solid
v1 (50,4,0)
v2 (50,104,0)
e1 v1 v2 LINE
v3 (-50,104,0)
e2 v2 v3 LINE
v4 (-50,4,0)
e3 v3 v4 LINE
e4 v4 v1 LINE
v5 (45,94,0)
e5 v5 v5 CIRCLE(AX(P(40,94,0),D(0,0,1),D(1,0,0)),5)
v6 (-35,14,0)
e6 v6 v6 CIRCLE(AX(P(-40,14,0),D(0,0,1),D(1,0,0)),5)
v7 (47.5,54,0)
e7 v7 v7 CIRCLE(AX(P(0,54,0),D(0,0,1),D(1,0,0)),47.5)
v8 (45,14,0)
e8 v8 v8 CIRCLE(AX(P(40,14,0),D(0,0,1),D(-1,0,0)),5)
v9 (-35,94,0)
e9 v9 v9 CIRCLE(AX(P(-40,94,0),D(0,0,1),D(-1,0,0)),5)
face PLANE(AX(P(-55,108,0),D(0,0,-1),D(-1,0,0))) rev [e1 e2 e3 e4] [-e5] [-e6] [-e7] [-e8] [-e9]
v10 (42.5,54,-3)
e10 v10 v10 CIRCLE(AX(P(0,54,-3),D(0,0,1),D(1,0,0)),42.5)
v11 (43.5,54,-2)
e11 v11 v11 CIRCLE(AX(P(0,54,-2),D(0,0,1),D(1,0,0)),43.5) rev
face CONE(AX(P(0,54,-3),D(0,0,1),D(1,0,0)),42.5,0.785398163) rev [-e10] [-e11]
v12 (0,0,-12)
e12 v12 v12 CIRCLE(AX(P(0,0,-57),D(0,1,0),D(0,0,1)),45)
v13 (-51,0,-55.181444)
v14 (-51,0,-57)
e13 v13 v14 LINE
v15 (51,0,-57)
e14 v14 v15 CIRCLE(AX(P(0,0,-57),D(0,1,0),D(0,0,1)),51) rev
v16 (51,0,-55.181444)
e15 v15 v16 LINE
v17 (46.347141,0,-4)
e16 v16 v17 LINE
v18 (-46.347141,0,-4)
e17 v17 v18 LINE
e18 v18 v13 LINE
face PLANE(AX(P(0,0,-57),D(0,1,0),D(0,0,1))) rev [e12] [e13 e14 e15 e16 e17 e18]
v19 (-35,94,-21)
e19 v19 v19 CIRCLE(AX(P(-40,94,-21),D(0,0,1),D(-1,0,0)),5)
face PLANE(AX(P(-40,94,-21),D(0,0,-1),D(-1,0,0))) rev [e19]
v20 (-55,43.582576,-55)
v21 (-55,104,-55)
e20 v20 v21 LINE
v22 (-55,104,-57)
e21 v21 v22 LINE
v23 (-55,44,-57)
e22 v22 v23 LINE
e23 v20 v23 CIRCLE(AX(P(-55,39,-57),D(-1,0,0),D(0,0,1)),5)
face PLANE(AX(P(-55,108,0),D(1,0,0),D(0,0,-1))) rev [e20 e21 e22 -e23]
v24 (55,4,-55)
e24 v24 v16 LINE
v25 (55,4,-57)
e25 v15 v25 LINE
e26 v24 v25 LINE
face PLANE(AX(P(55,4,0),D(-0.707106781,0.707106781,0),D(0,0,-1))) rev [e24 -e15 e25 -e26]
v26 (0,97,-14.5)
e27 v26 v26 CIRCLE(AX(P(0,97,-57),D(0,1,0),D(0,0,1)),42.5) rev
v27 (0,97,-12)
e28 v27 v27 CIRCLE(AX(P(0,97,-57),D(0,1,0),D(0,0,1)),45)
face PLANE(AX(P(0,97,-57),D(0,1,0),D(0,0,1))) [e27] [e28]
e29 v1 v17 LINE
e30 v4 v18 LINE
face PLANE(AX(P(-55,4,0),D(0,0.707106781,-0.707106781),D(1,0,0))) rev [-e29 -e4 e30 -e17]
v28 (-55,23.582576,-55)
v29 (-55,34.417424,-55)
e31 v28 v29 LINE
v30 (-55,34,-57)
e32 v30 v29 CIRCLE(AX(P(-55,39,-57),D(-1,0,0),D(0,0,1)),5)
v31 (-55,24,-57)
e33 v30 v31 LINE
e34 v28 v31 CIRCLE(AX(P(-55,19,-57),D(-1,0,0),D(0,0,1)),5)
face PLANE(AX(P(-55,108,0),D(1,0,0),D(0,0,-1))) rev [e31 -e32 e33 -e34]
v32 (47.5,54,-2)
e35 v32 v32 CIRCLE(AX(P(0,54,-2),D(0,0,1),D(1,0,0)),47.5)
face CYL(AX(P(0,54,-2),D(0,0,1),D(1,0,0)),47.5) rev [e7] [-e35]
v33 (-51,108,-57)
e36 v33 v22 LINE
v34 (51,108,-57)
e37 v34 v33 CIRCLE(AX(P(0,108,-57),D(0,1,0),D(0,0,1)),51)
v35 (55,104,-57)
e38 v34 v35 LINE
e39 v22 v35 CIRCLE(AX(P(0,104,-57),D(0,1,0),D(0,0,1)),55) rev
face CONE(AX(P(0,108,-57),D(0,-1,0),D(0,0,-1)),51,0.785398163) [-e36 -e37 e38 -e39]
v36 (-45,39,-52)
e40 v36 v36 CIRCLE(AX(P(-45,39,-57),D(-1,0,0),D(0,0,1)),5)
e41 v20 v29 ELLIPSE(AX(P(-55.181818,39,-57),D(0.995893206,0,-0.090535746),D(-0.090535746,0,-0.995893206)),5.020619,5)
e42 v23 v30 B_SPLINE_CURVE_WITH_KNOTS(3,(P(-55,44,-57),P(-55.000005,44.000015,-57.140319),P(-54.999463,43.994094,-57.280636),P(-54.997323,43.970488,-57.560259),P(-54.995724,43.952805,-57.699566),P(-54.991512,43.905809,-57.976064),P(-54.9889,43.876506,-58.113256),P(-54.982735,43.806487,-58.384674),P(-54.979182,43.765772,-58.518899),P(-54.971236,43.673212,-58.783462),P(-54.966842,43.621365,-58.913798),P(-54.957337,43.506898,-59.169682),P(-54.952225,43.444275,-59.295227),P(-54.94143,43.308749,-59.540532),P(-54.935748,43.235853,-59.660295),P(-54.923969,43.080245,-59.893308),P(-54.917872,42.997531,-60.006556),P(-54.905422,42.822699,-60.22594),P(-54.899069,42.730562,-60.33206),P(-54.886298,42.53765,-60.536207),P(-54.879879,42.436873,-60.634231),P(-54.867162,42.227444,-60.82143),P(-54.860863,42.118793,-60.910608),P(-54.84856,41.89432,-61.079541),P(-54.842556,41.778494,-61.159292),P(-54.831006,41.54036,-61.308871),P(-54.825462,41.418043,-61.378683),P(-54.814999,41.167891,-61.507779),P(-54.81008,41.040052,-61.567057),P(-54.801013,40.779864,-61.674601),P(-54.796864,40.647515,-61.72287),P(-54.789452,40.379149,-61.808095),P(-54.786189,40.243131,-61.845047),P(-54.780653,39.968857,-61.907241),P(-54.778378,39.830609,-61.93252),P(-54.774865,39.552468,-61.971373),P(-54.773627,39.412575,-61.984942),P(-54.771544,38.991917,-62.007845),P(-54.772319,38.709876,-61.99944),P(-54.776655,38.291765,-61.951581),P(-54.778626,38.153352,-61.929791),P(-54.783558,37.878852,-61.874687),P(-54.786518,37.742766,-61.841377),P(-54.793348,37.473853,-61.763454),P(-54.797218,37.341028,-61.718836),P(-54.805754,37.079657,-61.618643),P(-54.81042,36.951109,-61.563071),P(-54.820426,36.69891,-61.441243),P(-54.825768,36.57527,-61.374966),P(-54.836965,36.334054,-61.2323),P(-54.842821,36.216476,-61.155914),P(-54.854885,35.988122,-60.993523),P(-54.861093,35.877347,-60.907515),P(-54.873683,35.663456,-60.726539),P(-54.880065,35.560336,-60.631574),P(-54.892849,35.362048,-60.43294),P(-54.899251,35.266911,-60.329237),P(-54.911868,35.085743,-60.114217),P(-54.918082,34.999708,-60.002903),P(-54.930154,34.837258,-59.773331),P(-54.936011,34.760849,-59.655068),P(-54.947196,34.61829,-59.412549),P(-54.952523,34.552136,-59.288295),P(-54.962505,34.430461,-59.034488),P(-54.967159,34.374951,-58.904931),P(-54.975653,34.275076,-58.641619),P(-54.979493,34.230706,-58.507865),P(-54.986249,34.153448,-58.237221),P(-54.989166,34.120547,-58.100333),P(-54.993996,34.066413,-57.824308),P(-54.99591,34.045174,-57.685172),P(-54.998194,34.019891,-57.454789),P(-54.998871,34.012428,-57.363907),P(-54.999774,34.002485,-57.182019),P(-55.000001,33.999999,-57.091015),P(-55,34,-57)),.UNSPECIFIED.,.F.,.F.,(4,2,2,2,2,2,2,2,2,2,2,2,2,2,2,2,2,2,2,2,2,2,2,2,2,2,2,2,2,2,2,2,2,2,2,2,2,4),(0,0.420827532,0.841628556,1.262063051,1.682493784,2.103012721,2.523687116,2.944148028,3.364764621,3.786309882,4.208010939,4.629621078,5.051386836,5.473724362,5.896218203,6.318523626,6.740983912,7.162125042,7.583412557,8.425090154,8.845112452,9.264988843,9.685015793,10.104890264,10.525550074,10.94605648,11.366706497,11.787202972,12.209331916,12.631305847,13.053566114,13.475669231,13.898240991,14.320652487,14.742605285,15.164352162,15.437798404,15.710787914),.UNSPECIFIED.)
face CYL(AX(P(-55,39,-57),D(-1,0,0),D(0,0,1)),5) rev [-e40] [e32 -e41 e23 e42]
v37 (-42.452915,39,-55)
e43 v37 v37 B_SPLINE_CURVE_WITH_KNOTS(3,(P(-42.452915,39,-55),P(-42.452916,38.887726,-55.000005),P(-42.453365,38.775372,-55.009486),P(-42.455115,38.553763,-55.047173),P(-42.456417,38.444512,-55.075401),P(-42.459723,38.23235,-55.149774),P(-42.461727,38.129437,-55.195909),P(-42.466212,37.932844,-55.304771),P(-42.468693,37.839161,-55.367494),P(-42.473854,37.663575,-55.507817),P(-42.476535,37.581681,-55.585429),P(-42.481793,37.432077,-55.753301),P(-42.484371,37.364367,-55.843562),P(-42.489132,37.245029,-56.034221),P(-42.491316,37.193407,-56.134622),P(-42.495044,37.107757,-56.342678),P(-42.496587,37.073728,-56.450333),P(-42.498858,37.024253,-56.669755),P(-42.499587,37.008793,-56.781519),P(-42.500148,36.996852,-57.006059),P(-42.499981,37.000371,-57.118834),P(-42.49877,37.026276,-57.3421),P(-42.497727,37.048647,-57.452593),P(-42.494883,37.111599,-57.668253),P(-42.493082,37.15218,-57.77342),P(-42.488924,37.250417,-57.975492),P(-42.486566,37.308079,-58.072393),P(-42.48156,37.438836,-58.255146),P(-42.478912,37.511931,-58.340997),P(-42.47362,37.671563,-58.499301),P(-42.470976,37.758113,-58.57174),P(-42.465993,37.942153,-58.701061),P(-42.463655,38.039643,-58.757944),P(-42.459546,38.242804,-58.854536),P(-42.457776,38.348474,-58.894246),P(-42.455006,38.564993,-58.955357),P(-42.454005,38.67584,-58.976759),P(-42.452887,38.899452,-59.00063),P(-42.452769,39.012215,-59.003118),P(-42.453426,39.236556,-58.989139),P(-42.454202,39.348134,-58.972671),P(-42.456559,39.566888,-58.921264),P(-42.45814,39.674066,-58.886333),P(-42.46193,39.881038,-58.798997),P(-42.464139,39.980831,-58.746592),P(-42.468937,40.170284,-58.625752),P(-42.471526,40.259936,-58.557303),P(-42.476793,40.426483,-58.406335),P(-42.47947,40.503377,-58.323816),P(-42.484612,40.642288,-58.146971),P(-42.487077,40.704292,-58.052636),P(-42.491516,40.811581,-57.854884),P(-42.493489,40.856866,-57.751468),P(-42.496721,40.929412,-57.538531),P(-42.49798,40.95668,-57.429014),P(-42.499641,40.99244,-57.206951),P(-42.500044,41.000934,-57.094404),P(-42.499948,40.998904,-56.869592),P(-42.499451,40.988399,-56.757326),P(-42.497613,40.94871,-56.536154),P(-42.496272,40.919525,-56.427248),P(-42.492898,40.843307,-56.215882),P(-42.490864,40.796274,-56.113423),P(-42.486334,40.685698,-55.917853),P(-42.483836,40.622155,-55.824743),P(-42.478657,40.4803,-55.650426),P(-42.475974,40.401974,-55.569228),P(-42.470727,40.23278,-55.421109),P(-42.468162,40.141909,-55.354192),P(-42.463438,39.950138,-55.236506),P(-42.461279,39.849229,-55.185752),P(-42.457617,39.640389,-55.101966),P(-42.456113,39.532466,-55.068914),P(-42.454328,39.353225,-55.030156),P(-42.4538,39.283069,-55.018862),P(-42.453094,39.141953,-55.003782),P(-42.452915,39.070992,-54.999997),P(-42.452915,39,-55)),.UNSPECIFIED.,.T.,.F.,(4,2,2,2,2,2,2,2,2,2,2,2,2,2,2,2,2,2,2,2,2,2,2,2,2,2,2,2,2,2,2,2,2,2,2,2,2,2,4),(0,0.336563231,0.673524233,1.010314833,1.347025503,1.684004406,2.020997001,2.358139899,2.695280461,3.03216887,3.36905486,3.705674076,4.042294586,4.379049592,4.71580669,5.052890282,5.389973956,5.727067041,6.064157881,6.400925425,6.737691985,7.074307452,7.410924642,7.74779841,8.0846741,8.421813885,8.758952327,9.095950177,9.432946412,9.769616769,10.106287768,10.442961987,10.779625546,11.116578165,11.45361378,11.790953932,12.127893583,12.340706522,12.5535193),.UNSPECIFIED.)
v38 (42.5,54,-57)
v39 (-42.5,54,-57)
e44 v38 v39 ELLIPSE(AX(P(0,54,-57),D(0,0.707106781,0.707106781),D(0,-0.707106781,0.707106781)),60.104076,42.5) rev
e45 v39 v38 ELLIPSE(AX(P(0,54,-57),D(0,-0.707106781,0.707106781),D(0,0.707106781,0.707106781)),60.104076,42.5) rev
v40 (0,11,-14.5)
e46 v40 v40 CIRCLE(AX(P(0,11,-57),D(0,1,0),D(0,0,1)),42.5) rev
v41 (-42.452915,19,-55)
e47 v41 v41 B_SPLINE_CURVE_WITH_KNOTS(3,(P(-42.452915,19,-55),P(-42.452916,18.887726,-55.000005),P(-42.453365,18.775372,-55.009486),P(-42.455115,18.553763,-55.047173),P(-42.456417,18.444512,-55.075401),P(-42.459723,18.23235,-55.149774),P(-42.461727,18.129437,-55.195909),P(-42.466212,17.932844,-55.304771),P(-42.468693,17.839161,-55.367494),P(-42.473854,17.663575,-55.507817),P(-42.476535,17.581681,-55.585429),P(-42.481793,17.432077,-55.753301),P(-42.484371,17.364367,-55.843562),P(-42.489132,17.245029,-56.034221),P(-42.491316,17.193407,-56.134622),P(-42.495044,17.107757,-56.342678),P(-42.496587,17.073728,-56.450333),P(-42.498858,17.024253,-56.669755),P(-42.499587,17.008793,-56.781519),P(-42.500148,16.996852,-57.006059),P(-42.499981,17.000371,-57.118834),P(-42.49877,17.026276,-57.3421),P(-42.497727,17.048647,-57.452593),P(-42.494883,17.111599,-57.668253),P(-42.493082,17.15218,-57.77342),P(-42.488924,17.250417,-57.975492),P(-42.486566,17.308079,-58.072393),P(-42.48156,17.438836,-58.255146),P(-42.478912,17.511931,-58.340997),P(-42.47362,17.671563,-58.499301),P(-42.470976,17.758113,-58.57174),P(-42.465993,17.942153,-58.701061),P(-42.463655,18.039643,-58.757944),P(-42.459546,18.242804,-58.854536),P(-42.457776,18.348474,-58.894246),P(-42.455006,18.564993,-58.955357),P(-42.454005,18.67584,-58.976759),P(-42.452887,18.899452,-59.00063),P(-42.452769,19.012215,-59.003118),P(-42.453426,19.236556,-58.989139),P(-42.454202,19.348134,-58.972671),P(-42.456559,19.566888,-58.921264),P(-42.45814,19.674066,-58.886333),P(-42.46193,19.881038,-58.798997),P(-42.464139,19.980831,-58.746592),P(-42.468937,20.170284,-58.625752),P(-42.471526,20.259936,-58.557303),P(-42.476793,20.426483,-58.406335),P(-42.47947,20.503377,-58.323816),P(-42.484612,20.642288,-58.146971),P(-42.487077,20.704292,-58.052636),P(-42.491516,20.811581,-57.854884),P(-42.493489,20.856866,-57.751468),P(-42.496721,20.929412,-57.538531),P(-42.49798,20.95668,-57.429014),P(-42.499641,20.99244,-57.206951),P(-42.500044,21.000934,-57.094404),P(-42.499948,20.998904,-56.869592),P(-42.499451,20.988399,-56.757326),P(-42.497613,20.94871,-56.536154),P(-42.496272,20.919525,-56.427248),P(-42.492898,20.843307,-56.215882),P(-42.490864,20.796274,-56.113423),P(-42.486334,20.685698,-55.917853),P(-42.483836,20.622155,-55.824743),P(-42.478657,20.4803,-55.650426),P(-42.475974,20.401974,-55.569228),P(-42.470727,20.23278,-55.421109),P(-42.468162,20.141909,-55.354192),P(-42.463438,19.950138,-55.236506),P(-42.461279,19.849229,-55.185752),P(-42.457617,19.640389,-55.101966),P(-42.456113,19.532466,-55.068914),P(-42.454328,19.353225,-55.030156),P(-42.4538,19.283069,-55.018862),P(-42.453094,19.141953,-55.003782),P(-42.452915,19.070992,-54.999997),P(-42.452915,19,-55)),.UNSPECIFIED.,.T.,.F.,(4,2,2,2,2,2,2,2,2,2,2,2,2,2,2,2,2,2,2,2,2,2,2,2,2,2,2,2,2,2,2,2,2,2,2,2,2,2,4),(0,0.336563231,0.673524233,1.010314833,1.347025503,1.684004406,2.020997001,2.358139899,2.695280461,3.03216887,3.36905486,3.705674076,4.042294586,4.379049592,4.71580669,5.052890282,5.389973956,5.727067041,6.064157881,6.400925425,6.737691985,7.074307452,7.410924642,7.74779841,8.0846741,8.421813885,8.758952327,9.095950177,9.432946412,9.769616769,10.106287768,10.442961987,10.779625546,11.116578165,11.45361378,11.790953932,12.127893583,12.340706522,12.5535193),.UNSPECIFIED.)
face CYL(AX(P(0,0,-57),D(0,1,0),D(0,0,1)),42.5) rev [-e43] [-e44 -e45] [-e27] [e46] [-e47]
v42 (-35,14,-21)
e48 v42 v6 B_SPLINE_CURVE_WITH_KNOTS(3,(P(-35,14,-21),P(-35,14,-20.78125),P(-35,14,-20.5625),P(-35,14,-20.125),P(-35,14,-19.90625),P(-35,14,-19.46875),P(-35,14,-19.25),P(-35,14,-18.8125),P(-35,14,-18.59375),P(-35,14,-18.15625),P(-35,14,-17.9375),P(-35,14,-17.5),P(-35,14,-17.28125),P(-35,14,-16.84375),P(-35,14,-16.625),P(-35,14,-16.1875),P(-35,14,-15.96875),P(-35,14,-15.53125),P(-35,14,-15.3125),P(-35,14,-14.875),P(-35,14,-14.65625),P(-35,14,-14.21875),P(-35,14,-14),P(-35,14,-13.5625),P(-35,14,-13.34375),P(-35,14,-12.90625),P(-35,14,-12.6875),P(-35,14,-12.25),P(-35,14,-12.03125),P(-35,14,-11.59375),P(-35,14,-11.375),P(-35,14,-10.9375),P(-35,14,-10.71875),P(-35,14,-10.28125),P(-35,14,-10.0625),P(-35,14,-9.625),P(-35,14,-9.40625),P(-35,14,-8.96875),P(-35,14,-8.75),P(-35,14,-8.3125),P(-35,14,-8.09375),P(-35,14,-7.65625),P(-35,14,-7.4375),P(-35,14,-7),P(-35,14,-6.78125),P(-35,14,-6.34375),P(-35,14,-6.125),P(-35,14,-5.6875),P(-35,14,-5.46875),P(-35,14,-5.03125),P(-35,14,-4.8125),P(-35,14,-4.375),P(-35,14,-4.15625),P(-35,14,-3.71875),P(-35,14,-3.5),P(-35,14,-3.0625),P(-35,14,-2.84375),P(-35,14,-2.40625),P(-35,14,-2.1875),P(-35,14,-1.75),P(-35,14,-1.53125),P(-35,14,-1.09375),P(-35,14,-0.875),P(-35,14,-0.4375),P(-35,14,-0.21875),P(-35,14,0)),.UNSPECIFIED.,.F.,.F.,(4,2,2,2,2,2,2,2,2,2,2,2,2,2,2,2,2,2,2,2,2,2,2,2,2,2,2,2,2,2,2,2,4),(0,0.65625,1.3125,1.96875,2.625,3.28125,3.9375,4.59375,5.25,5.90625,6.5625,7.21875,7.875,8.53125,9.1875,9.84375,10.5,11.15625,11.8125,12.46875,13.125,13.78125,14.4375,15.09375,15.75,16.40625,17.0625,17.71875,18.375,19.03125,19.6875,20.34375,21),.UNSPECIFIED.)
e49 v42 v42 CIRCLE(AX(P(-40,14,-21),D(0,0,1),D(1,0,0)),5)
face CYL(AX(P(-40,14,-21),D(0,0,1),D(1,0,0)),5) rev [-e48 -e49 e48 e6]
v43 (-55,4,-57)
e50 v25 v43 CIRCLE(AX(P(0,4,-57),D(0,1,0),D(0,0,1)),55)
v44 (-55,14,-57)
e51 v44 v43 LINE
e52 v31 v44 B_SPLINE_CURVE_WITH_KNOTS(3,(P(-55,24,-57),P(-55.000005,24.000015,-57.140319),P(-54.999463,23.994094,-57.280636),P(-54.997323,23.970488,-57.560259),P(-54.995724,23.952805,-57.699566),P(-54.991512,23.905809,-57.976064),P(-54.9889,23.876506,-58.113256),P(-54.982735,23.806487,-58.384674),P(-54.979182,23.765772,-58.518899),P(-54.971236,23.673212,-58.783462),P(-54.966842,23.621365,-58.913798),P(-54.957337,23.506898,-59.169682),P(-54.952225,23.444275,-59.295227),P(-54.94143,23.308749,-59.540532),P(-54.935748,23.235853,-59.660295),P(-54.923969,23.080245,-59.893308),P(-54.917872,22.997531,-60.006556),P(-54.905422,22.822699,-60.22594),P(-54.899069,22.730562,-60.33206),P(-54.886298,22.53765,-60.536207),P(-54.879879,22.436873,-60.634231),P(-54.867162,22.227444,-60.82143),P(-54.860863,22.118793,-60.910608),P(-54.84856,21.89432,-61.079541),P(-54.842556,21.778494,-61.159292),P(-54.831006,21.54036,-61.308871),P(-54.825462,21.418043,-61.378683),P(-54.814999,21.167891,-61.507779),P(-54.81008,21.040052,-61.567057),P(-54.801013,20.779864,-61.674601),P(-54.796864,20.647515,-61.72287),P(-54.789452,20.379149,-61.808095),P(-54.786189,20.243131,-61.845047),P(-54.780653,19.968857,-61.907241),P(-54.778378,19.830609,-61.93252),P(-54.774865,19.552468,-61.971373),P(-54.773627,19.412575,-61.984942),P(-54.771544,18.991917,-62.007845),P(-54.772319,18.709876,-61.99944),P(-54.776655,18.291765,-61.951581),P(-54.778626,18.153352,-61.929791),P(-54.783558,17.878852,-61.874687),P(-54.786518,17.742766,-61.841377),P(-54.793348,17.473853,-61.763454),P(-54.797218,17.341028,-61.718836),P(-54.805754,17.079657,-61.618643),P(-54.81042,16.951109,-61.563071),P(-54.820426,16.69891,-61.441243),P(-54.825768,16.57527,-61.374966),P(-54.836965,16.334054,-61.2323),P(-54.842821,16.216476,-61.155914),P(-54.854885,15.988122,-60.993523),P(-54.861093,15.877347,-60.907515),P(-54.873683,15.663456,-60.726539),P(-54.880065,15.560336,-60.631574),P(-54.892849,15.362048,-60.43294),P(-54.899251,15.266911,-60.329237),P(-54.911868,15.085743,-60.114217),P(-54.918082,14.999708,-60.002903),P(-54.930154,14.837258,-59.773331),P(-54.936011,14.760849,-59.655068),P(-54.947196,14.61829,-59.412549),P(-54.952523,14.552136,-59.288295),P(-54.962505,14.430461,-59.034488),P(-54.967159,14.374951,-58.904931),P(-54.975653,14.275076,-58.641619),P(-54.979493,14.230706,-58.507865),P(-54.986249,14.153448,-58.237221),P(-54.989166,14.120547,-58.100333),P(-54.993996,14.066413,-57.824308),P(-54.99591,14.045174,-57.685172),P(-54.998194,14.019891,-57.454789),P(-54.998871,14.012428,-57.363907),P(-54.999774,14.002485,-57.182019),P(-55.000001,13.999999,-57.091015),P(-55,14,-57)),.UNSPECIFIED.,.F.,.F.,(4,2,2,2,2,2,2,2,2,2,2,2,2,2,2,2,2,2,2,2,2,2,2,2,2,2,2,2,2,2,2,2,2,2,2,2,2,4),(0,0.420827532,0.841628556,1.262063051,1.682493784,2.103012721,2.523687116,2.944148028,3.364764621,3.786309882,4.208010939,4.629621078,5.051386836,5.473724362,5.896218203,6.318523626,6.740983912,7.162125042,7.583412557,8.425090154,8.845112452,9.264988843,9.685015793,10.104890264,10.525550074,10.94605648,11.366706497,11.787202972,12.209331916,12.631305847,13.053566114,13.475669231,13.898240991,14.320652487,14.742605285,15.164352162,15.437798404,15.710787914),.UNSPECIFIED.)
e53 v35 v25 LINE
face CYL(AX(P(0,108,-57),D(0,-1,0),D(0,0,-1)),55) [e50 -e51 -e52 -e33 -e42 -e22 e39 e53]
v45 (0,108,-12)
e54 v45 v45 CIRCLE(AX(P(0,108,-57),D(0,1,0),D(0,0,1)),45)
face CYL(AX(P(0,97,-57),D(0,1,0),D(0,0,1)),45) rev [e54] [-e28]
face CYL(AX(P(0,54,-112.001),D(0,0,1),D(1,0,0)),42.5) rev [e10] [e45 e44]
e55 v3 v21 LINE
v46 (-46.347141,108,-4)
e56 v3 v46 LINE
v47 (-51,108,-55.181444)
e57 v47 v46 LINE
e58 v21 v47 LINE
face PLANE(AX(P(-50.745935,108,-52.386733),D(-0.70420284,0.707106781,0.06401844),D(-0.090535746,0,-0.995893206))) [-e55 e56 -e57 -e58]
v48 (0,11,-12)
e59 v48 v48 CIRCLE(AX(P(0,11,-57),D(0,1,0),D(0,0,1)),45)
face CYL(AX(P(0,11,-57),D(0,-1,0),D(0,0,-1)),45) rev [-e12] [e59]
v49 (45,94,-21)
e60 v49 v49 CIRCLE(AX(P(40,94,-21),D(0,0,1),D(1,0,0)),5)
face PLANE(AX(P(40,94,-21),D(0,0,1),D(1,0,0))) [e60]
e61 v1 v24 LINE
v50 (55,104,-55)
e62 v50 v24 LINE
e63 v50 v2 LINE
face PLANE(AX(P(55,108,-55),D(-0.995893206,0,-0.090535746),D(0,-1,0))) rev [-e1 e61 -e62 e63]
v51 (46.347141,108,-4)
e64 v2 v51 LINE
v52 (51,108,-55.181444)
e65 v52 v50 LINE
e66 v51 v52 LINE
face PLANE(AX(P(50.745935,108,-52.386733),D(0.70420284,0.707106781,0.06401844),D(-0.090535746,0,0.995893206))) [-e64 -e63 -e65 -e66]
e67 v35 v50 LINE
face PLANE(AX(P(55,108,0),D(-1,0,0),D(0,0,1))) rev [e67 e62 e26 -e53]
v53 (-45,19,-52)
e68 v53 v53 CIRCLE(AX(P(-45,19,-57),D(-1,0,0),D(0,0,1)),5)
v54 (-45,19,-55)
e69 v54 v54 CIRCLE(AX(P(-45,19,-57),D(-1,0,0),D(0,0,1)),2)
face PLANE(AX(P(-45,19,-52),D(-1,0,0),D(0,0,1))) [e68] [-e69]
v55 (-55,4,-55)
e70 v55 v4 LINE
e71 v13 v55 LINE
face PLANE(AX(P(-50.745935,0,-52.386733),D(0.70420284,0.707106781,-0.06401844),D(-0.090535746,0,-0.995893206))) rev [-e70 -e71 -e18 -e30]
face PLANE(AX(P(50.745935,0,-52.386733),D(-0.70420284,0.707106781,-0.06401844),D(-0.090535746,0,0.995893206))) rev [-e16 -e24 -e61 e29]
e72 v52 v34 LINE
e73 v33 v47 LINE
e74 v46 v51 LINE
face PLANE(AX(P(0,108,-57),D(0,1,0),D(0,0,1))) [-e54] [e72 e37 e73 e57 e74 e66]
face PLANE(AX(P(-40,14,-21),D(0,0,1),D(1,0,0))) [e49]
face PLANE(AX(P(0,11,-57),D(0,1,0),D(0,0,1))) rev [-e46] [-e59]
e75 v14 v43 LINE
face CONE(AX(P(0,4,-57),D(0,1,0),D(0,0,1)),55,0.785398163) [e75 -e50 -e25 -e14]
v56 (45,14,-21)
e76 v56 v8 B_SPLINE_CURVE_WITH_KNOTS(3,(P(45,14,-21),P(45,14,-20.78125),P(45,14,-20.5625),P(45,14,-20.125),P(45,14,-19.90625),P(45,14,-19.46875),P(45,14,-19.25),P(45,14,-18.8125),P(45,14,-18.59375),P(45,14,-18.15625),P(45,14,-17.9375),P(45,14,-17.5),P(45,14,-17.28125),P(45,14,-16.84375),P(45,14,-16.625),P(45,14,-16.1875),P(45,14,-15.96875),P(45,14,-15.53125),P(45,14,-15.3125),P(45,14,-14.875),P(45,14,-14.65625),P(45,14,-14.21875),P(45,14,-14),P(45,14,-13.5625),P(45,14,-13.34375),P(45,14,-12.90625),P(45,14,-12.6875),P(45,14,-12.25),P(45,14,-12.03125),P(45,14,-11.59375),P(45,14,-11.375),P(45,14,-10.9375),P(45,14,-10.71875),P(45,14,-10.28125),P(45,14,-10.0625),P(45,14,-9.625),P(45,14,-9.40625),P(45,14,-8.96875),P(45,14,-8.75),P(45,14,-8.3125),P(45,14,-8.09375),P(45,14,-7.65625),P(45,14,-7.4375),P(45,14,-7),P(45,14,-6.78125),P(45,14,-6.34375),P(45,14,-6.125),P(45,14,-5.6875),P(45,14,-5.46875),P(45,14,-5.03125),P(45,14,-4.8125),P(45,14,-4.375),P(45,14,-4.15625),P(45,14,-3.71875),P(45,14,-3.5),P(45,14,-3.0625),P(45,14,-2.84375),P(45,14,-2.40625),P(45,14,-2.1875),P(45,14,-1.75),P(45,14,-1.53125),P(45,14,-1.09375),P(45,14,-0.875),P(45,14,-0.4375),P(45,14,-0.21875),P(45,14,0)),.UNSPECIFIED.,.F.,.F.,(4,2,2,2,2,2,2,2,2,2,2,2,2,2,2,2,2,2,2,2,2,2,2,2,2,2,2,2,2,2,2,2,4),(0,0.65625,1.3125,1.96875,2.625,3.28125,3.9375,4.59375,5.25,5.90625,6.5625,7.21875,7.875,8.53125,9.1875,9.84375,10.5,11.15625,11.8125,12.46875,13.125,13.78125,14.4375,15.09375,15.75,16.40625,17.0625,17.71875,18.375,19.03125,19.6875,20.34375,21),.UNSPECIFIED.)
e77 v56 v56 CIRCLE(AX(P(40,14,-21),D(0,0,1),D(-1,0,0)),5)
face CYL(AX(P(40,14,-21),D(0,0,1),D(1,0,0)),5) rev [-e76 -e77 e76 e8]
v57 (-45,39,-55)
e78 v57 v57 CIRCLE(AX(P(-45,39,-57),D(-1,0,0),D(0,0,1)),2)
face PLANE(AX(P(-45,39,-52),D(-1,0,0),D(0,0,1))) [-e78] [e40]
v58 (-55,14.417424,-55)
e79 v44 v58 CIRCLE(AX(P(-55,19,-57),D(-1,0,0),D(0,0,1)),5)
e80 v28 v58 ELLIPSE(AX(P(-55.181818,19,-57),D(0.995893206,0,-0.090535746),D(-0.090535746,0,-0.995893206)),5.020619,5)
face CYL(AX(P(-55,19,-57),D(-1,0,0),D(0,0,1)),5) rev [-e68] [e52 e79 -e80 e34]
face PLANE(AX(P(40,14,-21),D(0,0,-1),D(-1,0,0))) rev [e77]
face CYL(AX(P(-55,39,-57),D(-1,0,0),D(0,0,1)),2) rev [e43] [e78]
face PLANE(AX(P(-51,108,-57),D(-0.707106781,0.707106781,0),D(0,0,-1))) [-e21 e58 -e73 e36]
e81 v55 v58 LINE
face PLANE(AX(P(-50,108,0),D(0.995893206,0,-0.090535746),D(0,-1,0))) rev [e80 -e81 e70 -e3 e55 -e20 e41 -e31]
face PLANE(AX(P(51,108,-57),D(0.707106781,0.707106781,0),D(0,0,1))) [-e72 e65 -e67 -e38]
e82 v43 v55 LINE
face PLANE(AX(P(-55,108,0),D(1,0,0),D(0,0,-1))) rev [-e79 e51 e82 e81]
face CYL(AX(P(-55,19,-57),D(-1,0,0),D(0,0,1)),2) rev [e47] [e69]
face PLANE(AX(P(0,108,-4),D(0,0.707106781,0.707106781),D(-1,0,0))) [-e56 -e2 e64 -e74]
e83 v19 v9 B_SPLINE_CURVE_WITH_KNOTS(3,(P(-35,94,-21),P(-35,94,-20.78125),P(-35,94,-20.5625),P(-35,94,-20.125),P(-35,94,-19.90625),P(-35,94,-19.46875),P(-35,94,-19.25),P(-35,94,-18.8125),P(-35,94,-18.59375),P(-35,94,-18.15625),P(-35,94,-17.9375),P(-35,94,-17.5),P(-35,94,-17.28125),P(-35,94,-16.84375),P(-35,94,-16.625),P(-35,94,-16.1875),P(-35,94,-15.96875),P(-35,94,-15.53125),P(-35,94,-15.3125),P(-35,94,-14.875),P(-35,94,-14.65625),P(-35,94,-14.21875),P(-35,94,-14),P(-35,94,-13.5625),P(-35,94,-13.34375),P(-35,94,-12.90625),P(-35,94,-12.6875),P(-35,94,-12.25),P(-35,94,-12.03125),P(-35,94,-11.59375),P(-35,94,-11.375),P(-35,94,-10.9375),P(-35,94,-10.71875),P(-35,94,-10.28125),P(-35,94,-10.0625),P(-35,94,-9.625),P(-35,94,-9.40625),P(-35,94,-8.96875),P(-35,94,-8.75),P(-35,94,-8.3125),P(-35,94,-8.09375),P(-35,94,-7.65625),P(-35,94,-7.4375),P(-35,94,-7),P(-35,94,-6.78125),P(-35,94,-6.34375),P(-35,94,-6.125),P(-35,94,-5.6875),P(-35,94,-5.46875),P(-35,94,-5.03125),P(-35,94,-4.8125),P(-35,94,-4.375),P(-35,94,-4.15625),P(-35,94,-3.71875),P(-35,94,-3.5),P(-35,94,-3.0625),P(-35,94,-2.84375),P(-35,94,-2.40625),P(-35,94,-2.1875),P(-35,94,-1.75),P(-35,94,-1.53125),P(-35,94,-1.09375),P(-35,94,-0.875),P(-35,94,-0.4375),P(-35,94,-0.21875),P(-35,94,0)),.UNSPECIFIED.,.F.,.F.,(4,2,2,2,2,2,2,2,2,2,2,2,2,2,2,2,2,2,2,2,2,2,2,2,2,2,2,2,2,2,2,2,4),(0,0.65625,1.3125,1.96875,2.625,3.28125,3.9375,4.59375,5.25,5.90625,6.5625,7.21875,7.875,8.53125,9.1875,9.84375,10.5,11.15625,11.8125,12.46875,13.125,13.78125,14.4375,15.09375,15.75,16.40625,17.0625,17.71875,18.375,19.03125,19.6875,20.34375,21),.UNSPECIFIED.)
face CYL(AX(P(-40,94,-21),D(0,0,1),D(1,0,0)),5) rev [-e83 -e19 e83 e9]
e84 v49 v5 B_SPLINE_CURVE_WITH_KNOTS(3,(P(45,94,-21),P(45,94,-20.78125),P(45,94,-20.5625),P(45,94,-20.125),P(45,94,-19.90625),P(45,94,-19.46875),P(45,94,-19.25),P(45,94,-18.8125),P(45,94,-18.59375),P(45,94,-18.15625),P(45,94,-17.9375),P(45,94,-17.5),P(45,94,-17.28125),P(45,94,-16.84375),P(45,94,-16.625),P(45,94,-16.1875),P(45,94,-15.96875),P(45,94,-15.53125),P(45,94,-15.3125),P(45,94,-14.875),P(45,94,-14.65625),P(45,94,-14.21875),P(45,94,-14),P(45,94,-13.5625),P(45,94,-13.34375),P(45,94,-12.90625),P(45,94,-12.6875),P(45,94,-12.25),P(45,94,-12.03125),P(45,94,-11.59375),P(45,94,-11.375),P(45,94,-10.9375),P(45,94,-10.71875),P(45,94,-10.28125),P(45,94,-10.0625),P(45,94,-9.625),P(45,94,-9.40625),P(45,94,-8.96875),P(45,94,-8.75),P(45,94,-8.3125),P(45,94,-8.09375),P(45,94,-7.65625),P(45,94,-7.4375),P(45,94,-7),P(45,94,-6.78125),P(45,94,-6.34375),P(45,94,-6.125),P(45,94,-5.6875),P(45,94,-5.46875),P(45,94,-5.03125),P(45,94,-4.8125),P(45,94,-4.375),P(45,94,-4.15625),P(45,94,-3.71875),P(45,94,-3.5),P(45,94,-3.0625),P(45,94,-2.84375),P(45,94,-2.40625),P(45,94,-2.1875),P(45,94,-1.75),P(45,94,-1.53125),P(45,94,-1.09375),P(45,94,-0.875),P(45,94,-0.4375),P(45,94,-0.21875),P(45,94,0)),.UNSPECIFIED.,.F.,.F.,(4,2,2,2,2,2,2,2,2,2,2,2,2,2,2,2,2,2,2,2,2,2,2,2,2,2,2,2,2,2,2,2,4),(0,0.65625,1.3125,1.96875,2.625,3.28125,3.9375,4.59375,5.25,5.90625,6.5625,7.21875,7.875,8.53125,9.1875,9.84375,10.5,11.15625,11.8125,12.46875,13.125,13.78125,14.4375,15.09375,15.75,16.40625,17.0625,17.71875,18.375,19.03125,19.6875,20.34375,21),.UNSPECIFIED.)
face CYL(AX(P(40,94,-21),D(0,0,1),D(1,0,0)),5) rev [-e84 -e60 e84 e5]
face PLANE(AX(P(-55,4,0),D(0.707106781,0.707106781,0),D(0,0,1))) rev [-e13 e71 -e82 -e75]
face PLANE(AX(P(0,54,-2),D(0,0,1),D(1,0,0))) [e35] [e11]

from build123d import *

# Parameters (mm, degrees)
EXTRUDE_1_DEPTH          = 108
CHAMFER_1_SIZE           = 55
CHAMFER_1_SIZE2          = 5
CHAMFER_2_SIZE           = 5
CHAMFER_2_SIZE2          = 55
CHAMFER_3_SIZE           = 4
SKETCH_2_R               = 42.5
CUT_EXTRUDE_1_DEPTH      = 108
SKETCH_3_R               = 45
CUT_EXTRUDE_2_DEPTH      = 11
CUT_EXTRUDE_START        = -97
SKETCH_3_2_R             = 45
CUT_EXTRUDE_3_DEPTH      = 11
SKETCH_4_R               = 5
CUT_EXTRUDE_4_DEPTH      = 21
SKETCH_8_R               = 47.5
CUT_EXTRUDE_5_DEPTH      = 2
CUT_EXTRUDE_6_REACH      = 165.673
CUT_EXTRUDE_6_END_RADIUS = 42.5
SKETCH_9_R               = 42.5
CHAMFER_4_SIZE           = 1


with BuildPart() as part:
    # 草图1 → 凸台-拉伸1 (new body)
    with BuildSketch(Plane(origin=(0, 0, 0), x_dir=(1, 0, 0), z_dir=(0, 1, 0))):
        with BuildLine():
            Line((-55, 0), (55, 0))
            Line((55, 0), (55, 57))
            ThreePointArc((55, 57), (0, 112), (-55, 57))
            Line((-55, 57), (-55, 0))
        make_face()
    extrude(amount=EXTRUDE_1_DEPTH)

    # 倒角1
    chamfer_1_edges = [part.edges().sort_by_distance(p)[0] for p in [
        (-55, 54, 0),
    ]]
    chamfer_1_side = [part.faces().sort_by_distance(p)[0] for p in [
        (-55, 54, -28.5),
    ]]
    chamfer(chamfer_1_edges, length=CHAMFER_1_SIZE, length2=CHAMFER_1_SIZE2, reference=chamfer_1_side[0])

    # 倒角2
    chamfer_2_edges = [part.edges().sort_by_distance(p)[0] for p in [
        (55, 54, 0),
    ]]
    chamfer_2_side = [part.faces().sort_by_distance(p)[0] for p in [
        (2.5, 54, 0),
    ]]
    chamfer(chamfer_2_edges, length=CHAMFER_2_SIZE, length2=CHAMFER_2_SIZE2, reference=chamfer_2_side[0])

    # 倒角3
    # the kernel refuses this chamfer: 4 mm, written as the material it takes off along each edge
    with BuildSketch(Plane(origin=(-55, 108, -57), x_dir=(-0.027495876610585647, -0.9996219169112968, 0), z_dir=(0, 0, 1)), Plane(origin=(55, 0, -44.713268048), x_dir=(-0.9996219169112968, -0.02749587661058639, 0), z_dir=(0, 0, -1)), Plane(origin=(55, 108, -44.713268048), x_dir=(0.027495876610585647, -0.9996219169112968, 0), z_dir=(0, 0, -1)), Plane(origin=(-55, 0, -57), x_dir=(0.9996219169112968, -0.02749587661058639, 0), z_dir=(0, 0, 1))) as chamfer_3_piece_1:
        Polygon((CHAMFER_3_SIZE * 0.999621916911, CHAMFER_3_SIZE * 0.0274958766106), (-CHAMFER_3_SIZE * 0.0274958766106, CHAMFER_3_SIZE * 0.999621916911), (0, 0), align=None)
    extrude(amount=12.286731952, mode=Mode.SUBTRACT)
    with BuildSketch(Plane(origin=(-60.286731952, 0, 0), x_dir=(0, -0.027495876610586372, -0.9996219169112968), z_dir=(1, 0, 0)), Plane(origin=(-60.286731952, 108, 0), x_dir=(0, -0.9996219169112968, 0.02749587661058639), z_dir=(1, 0, 0))) as chamfer_3_piece_2:
        Polygon((CHAMFER_3_SIZE * 0.999621916911, CHAMFER_3_SIZE * 0.0274958766106), (-CHAMFER_3_SIZE * 0.0274958766106, CHAMFER_3_SIZE * 0.999621916911), (0, 0), align=None)
    extrude(amount=120.573463904, mode=Mode.SUBTRACT)
    with BuildSketch(Plane(origin=(-55.931316952, 0, -65.244486468), x_dir=(0.995516676088184, -0.027495876610586417, -0.09050151600801698), z_dir=(0.09053574604251878, 0, 0.9958932064677039)), Plane(origin=(-55.931316952, 108, -65.244486468), x_dir=(-0.027382956722356327, -0.9996219169112968, 0.0024893597020324005), z_dir=(0.09053574604251878, 0, 0.9958932064677039)), Plane(origin=(49.068683048, 0, 10.244486468), x_dir=(-0.995516676088184, -0.027495876610586358, -0.09050151600801698), z_dir=(0.09053574604251878, 0, -0.9958932064677039)), Plane(origin=(49.068683048, 108, 10.244486468), x_dir=(0.027382956722356445, -0.9996219169112968, 0.0024893597020324114), z_dir=(0.09053574604251878, 0, -0.9958932064677039))) as chamfer_3_piece_3:
        Polygon((CHAMFER_3_SIZE * 0.999621916911, CHAMFER_3_SIZE * 0.0274958766106), (-CHAMFER_3_SIZE * 0.0274958766106, CHAMFER_3_SIZE * 0.999621916911), (0, 0), align=None)
    extrude(amount=75.80026899, mode=Mode.SUBTRACT)
    with BuildSketch(Plane(origin=(0, 0, -57), x_dir=(1, 0, 0), z_dir=(0, 0, 1))) as chamfer_3_piece_4:
        Polygon((55 - CHAMFER_3_SIZE, 0), (55, CHAMFER_3_SIZE), (55, 0), align=None)
    revolve(axis=Axis((0, 0, -57), (0, 1, 0)), revolution_arc=180, mode=Mode.SUBTRACT)
    with BuildSketch(Plane(origin=(0, 108, -57), x_dir=(1, 0, 0), z_dir=(0, 0, 1))) as chamfer_3_piece_5:
        Polygon((55, -CHAMFER_3_SIZE), (55 - CHAMFER_3_SIZE, 0), (55, 0), align=None)
    revolve(axis=Axis((0, 108, -57), (0, 1, 0)), revolution_arc=180, mode=Mode.SUBTRACT)

    # 草图2 → 切除-拉伸1 (cut)
    with BuildSketch(Plane(origin=(0, 108, 0), x_dir=(1, 0, 0), z_dir=(0, 1, 0))):
        with Locations(Location((0, 57, 0), (0, 0, 270))):
            Circle(SKETCH_2_R)
    extrude(amount=-CUT_EXTRUDE_1_DEPTH, mode=Mode.SUBTRACT)

    # 草图3 → 切除-拉伸2 (cut)
    with BuildSketch(Plane(origin=(0, 108, 0), x_dir=(1, 0, 0), z_dir=(0, 1, 0))):
        with Locations(Location((0, 57, 0), (0, 0, 270))):
            Circle(SKETCH_3_R)
    extrude(amount=-CUT_EXTRUDE_2_DEPTH, mode=Mode.SUBTRACT)

    # 草图3<2> → 切除-拉伸3 (cut)
    with BuildSketch(Plane(origin=(0, 108, 0), x_dir=(1, 0, 0), z_dir=(0, 1, 0)).offset(CUT_EXTRUDE_START)):
        with Locations(Location((0, 57, 0), (0, 0, 270))):
            Circle(SKETCH_3_2_R)
    extrude(amount=-CUT_EXTRUDE_3_DEPTH, mode=Mode.SUBTRACT)

    # 草图4 → 切除-拉伸4 (cut)
    with BuildSketch(Plane.XY):
        with Locations((40, 94)):
            Circle(SKETCH_4_R)
        with Locations((40, 14)):
            Circle(SKETCH_4_R)
        with Locations((-40, 14)):
            Circle(SKETCH_4_R)
        with Locations((-40, 94)):
            Circle(SKETCH_4_R)
    extrude(amount=-CUT_EXTRUDE_4_DEPTH, mode=Mode.SUBTRACT)

    # 草图6 → 切除-旋转1 (revolve, cut)
    with BuildSketch(Plane(origin=(0, 19, 0), x_dir=(-1, 0, 0), z_dir=(0, -1, 0))):
        Polygon((55, 57), (55, 52), (45, 52), (45, 55), (35, 55), (35, 57), align=None)
    revolve(axis=Axis((-55, 19, -57), (1, 0, 0)), mode=Mode.SUBTRACT)

    # 草图7 → 切除-旋转2 (revolve, cut)
    with BuildSketch(Plane(origin=(0, 39, 0), x_dir=(-1, 0, 0), z_dir=(0, -1, 0))):
        Polygon((35, 55), (35, 57), (55, 57), (55, 52), (45, 52), (45, 55), align=None)
    revolve(axis=Axis((-55, 39, -57), (1, 0, 0)), mode=Mode.SUBTRACT)

    # 草图8 → 切除-拉伸5 (cut)
    with BuildSketch(Plane.XY):
        with Locations((0, 54)):
            Circle(SKETCH_8_R)
    extrude(amount=-CUT_EXTRUDE_5_DEPTH, mode=Mode.SUBTRACT)

    # 切除-拉伸6: up to this cylinder (the profile starts outside it)
    cut_extrude_6_end = Plane(origin=(0, 54, -57), z_dir=(0, 1, 0)) * Cylinder(CUT_EXTRUDE_6_END_RADIUS, 417.346, mode=Mode.PRIVATE)
    # 草图9 → 切除-拉伸6 (cut, up to the surface)
    with BuildSketch(Plane.XY.offset(-2), mode=Mode.PRIVATE) as cut_extrude_6_sk1:
        with Locations((0, 54)):
            Circle(SKETCH_9_R)
    cut_extrude_6_tool1 = extrude(cut_extrude_6_sk1.sketch, amount=-CUT_EXTRUDE_6_REACH, mode=Mode.PRIVATE) - cut_extrude_6_end
    add(cut_extrude_6_tool1.solids().sort_by_distance((0, 54, -2))[0], mode=Mode.SUBTRACT)

    # 倒角4
    chamfer_4_edges = [part.edges().sort_by_distance(p)[0] for p in [
        (-42.5, 54, -2),
    ]]
    chamfer(chamfer_4_edges, length=CHAMFER_4_SIZE)


solid = part.part
